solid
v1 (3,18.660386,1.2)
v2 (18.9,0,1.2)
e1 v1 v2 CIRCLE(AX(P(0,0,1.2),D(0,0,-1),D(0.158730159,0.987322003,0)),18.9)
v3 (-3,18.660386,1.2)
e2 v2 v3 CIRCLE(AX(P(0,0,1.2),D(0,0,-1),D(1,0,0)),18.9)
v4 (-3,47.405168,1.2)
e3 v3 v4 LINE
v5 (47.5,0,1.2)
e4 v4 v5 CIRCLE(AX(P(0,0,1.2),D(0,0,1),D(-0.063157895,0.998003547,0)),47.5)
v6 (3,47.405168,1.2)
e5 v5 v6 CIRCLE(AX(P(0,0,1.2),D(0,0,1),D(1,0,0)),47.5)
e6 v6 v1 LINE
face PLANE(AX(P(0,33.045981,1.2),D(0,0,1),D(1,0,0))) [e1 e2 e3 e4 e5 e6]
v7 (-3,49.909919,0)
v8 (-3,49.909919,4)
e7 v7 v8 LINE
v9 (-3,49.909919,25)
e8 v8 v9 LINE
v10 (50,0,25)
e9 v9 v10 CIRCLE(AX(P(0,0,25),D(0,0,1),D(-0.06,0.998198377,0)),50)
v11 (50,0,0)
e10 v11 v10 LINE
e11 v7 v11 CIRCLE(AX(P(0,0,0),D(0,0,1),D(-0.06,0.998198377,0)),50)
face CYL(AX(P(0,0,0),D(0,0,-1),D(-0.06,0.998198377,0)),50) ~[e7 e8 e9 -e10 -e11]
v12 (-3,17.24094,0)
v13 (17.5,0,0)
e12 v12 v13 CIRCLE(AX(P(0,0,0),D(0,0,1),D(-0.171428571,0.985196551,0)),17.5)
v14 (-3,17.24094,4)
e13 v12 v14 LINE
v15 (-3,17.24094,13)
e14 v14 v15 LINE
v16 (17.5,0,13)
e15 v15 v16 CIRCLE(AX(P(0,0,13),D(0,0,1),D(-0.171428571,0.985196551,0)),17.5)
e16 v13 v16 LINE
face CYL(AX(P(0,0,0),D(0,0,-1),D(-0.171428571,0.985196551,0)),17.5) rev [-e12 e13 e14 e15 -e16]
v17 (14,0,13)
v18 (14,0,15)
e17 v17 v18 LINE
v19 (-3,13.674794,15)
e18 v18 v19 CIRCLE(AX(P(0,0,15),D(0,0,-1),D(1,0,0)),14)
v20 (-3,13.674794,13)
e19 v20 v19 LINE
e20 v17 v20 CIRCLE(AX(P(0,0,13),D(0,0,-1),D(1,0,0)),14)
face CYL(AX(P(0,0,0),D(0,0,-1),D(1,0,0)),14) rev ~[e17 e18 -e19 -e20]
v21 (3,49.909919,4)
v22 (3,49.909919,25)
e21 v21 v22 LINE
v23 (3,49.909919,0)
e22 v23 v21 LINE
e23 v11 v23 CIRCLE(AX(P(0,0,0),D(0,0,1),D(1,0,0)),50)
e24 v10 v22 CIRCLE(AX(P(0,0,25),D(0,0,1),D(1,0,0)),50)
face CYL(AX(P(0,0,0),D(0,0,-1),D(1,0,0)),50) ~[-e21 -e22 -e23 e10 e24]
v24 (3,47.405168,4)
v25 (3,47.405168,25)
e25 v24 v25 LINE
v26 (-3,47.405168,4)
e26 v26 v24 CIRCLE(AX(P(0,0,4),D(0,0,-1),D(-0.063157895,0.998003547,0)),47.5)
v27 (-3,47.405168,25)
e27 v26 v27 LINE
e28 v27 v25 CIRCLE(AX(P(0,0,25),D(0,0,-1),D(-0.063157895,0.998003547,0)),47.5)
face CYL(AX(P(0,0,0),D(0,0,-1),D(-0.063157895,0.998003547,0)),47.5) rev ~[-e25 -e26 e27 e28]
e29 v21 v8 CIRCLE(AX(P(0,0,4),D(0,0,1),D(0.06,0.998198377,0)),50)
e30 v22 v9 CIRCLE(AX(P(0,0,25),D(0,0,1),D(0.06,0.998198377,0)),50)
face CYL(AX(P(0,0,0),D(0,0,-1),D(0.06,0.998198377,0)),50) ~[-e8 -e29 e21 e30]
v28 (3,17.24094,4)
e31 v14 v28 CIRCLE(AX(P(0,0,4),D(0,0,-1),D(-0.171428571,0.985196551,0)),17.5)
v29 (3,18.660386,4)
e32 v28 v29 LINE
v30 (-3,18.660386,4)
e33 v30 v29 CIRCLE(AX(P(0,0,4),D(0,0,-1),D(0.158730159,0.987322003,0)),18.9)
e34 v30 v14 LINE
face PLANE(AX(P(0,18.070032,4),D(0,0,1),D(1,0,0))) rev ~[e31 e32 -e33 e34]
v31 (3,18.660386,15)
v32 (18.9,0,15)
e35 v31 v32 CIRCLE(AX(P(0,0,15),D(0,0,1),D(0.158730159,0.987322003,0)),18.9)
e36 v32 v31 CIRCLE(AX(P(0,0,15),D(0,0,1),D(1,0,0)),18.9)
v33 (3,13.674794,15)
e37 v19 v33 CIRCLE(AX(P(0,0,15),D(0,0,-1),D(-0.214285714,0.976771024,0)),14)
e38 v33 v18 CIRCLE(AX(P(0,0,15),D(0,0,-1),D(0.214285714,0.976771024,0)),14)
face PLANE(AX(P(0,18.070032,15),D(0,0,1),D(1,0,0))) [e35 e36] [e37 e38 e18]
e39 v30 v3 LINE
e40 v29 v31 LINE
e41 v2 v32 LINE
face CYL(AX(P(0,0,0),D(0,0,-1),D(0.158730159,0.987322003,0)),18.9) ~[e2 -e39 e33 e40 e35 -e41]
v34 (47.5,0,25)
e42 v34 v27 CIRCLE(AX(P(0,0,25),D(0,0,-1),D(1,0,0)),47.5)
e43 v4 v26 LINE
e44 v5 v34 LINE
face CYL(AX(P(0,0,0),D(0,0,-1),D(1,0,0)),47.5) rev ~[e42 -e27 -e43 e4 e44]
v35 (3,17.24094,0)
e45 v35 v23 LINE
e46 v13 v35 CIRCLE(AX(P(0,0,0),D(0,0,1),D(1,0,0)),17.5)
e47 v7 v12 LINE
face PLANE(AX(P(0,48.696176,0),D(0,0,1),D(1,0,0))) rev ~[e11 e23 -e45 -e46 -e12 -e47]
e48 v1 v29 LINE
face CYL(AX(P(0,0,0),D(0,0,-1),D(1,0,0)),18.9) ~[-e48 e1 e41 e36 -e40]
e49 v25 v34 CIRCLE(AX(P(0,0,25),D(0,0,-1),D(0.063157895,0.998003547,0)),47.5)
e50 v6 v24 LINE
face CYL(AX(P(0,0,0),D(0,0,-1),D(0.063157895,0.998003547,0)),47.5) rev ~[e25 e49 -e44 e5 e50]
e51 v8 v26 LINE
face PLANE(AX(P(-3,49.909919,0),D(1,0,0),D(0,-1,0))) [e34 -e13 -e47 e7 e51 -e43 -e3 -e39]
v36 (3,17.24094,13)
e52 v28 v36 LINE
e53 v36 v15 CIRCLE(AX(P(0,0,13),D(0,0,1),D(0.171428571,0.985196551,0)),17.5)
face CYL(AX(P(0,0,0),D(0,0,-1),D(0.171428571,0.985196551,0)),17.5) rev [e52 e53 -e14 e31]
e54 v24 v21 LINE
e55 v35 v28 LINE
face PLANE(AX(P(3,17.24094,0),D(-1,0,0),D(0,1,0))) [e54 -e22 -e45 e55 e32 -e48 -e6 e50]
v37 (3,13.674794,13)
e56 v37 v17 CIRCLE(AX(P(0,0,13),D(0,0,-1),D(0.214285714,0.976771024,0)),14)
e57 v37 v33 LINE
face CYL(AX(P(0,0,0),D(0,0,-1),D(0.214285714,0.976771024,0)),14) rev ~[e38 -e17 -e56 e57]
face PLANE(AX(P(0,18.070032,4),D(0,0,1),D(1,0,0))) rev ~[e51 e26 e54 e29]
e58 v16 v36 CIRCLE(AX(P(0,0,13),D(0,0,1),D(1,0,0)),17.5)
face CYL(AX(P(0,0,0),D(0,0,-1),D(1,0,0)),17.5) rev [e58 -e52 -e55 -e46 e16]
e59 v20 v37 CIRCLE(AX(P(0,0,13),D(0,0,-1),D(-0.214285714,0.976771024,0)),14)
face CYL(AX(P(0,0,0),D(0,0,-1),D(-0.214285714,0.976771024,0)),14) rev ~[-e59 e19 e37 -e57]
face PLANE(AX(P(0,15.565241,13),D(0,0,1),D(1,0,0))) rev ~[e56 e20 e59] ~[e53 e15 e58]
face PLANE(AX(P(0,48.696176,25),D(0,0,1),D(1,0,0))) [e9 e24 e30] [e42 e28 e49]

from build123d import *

# Parameters (mm, degrees)
F1_DEPTH = 15
F2_DEPTH = 13
F3_DEPTH = 1.2
F4_DEPTH = 25
F5_DEPTH = 4


with BuildPart() as f1:
    # F0 (on Top) → F1 (new body)
    with BuildSketch(Plane.XY):
        with BuildLine():
            ThreePointArc((-3, 17.2409396496), (0, 17.5), (3, 17.2409396496))
            Line((3, 17.2409396496), (3, 18.6603858481))
            ThreePointArc((3, 18.6603858481), (0, 18.9), (-3, 18.6603858481))
            Line((-3, 18.6603858481), (-3, 17.2409396496))
        make_face()
        with BuildLine():
            Line((3, 18.6603858481), (3, 17.2409396496))
            ThreePointArc((3, 17.2409396496), (13.393095236, 11.2638803261), (17.5, 0))
            ThreePointArc((17.5, 0), (-11.2638803261, -13.393095236), (-3, 17.2409396496))
            Line((-3, 17.2409396496), (-3, 18.6603858481))
            ThreePointArc((-3, 18.6603858481), (-12.2578546247, -14.3859306268), (18.9, 0))
            ThreePointArc((18.9, 0), (14.3859306268, 12.2578546247), (3, 18.6603858481))
        make_face()
        with BuildLine():
            ThreePointArc((-3, 13.6747943312), (0, 14), (3, 13.6747943312))
            Line((3, 13.6747943312), (3, 17.2409396496))
            ThreePointArc((3, 17.2409396496), (0, 17.5), (-3, 17.2409396496))
            Line((-3, 17.2409396496), (-3, 13.6747943312))
        make_face()
        with BuildLine():
            ThreePointArc((3, 13.6747943312), (10.9087121146, 8.7749643874), (14, 0))
            ThreePointArc((14, 0), (-8.7749643874, -10.9087121146), (-3, 13.6747943312))
            Line((-3, 13.6747943312), (-3, 17.2409396496))
            ThreePointArc((-3, 17.2409396496), (-11.2638803261, -13.393095236), (17.5, 0))
            ThreePointArc((17.5, 0), (13.393095236, 11.2638803261), (3, 17.2409396496))
            Line((3, 17.2409396496), (3, 13.6747943312))
        make_face()
    extrude(amount=F1_DEPTH)

    # F0 (on Top) → F2 (cut)
    with BuildSketch(Plane.XY):
        with BuildLine():
            ThreePointArc((-3, 13.6747943312), (0, 14), (3, 13.6747943312))
            Line((3, 13.6747943312), (3, 17.2409396496))
            ThreePointArc((3, 17.2409396496), (0, 17.5), (-3, 17.2409396496))
            Line((-3, 17.2409396496), (-3, 13.6747943312))
        make_face()
        with BuildLine():
            ThreePointArc((3, 13.6747943312), (10.9087121146, 8.7749643874), (14, 0))
            ThreePointArc((14, 0), (-8.7749643874, -10.9087121146), (-3, 13.6747943312))
            Line((-3, 13.6747943312), (-3, 17.2409396496))
            ThreePointArc((-3, 17.2409396496), (-11.2638803261, -13.393095236), (17.5, 0))
            ThreePointArc((17.5, 0), (13.393095236, 11.2638803261), (3, 17.2409396496))
            Line((3, 17.2409396496), (3, 13.6747943312))
        make_face()
    extrude(amount=F2_DEPTH, mode=Mode.SUBTRACT)

    # F0 (on Top) → F3 (join)
    with BuildSketch(Plane.XY):
        with BuildLine():
            ThreePointArc((-3, 18.6603858481), (0, 18.9), (3, 18.6603858481))
            Line((3, 18.6603858481), (3, 47.4051684946))
            ThreePointArc((3, 47.4051684946), (0, 47.5), (-3, 47.4051684946))
            Line((-3, 47.4051684946), (-3, 18.6603858481))
        make_face()
        with BuildLine():
            Line((3, 47.4051684946), (3, 18.6603858481))
            ThreePointArc((3, 18.6603858481), (14.3859306268, 12.2578546247), (18.9, 0))
            ThreePointArc((18.9, 0), (-12.2578546247, -14.3859306268), (-3, 18.6603858481))
            Line((-3, 18.6603858481), (-3, 47.4051684946))
            ThreePointArc((-3, 47.4051684946), (-32.5096139626, -34.6319938785), (47.5, 0))
            ThreePointArc((47.5, 0), (34.6319938785, 32.5096139626), (3, 47.4051684946))
        make_face()
    extrude(amount=F3_DEPTH)

    # F0 (on Top) → F4 (join)
    with BuildSketch(Plane.XY):
        with BuildLine():
            ThreePointArc((-3, 47.4051684946), (0, 47.5), (3, 47.4051684946))
            Line((3, 47.4051684946), (3, 49.9099188539))
            ThreePointArc((3, 49.9099188539), (0, 50), (-3, 49.9099188539))
            Line((-3, 49.9099188539), (-3, 47.4051684946))
        make_face()
        with BuildLine():
            Line((3, 49.9099188539), (3, 47.4051684946))
            ThreePointArc((3, 47.4051684946), (34.6319938785, 32.5096139626), (47.5, 0))
            ThreePointArc((47.5, 0), (-32.5096139626, -34.6319938785), (-3, 47.4051684946))
            Line((-3, 47.4051684946), (-3, 49.9099188539))
            ThreePointArc((-3, 49.9099188539), (-34.278273002, -36.4005494464), (50, 0))
            ThreePointArc((50, 0), (36.4005494464, 34.278273002), (3, 49.9099188539))
        make_face()
    extrude(amount=F4_DEPTH)

    # F0 (on Top) → F5 (cut)
    with BuildSketch(Plane.XY):
        with BuildLine():
            ThreePointArc((-3, 17.2409396496), (0, 17.5), (3, 17.2409396496))
            Line((3, 17.2409396496), (3, 18.6603858481))
            ThreePointArc((3, 18.6603858481), (0, 18.9), (-3, 18.6603858481))
            Line((-3, 18.6603858481), (-3, 17.2409396496))
        make_face()
        with BuildLine():
            ThreePointArc((-3, 18.6603858481), (0, 18.9), (3, 18.6603858481))
            Line((3, 18.6603858481), (3, 47.4051684946))
            ThreePointArc((3, 47.4051684946), (0, 47.5), (-3, 47.4051684946))
            Line((-3, 47.4051684946), (-3, 18.6603858481))
        make_face()
        with BuildLine():
            ThreePointArc((-3, 47.4051684946), (0, 47.5), (3, 47.4051684946))
            Line((3, 47.4051684946), (3, 49.9099188539))
            ThreePointArc((3, 49.9099188539), (0, 50), (-3, 49.9099188539))
            Line((-3, 49.9099188539), (-3, 47.4051684946))
        make_face()
    extrude(amount=F5_DEPTH, mode=Mode.SUBTRACT)


solid = f1.part
